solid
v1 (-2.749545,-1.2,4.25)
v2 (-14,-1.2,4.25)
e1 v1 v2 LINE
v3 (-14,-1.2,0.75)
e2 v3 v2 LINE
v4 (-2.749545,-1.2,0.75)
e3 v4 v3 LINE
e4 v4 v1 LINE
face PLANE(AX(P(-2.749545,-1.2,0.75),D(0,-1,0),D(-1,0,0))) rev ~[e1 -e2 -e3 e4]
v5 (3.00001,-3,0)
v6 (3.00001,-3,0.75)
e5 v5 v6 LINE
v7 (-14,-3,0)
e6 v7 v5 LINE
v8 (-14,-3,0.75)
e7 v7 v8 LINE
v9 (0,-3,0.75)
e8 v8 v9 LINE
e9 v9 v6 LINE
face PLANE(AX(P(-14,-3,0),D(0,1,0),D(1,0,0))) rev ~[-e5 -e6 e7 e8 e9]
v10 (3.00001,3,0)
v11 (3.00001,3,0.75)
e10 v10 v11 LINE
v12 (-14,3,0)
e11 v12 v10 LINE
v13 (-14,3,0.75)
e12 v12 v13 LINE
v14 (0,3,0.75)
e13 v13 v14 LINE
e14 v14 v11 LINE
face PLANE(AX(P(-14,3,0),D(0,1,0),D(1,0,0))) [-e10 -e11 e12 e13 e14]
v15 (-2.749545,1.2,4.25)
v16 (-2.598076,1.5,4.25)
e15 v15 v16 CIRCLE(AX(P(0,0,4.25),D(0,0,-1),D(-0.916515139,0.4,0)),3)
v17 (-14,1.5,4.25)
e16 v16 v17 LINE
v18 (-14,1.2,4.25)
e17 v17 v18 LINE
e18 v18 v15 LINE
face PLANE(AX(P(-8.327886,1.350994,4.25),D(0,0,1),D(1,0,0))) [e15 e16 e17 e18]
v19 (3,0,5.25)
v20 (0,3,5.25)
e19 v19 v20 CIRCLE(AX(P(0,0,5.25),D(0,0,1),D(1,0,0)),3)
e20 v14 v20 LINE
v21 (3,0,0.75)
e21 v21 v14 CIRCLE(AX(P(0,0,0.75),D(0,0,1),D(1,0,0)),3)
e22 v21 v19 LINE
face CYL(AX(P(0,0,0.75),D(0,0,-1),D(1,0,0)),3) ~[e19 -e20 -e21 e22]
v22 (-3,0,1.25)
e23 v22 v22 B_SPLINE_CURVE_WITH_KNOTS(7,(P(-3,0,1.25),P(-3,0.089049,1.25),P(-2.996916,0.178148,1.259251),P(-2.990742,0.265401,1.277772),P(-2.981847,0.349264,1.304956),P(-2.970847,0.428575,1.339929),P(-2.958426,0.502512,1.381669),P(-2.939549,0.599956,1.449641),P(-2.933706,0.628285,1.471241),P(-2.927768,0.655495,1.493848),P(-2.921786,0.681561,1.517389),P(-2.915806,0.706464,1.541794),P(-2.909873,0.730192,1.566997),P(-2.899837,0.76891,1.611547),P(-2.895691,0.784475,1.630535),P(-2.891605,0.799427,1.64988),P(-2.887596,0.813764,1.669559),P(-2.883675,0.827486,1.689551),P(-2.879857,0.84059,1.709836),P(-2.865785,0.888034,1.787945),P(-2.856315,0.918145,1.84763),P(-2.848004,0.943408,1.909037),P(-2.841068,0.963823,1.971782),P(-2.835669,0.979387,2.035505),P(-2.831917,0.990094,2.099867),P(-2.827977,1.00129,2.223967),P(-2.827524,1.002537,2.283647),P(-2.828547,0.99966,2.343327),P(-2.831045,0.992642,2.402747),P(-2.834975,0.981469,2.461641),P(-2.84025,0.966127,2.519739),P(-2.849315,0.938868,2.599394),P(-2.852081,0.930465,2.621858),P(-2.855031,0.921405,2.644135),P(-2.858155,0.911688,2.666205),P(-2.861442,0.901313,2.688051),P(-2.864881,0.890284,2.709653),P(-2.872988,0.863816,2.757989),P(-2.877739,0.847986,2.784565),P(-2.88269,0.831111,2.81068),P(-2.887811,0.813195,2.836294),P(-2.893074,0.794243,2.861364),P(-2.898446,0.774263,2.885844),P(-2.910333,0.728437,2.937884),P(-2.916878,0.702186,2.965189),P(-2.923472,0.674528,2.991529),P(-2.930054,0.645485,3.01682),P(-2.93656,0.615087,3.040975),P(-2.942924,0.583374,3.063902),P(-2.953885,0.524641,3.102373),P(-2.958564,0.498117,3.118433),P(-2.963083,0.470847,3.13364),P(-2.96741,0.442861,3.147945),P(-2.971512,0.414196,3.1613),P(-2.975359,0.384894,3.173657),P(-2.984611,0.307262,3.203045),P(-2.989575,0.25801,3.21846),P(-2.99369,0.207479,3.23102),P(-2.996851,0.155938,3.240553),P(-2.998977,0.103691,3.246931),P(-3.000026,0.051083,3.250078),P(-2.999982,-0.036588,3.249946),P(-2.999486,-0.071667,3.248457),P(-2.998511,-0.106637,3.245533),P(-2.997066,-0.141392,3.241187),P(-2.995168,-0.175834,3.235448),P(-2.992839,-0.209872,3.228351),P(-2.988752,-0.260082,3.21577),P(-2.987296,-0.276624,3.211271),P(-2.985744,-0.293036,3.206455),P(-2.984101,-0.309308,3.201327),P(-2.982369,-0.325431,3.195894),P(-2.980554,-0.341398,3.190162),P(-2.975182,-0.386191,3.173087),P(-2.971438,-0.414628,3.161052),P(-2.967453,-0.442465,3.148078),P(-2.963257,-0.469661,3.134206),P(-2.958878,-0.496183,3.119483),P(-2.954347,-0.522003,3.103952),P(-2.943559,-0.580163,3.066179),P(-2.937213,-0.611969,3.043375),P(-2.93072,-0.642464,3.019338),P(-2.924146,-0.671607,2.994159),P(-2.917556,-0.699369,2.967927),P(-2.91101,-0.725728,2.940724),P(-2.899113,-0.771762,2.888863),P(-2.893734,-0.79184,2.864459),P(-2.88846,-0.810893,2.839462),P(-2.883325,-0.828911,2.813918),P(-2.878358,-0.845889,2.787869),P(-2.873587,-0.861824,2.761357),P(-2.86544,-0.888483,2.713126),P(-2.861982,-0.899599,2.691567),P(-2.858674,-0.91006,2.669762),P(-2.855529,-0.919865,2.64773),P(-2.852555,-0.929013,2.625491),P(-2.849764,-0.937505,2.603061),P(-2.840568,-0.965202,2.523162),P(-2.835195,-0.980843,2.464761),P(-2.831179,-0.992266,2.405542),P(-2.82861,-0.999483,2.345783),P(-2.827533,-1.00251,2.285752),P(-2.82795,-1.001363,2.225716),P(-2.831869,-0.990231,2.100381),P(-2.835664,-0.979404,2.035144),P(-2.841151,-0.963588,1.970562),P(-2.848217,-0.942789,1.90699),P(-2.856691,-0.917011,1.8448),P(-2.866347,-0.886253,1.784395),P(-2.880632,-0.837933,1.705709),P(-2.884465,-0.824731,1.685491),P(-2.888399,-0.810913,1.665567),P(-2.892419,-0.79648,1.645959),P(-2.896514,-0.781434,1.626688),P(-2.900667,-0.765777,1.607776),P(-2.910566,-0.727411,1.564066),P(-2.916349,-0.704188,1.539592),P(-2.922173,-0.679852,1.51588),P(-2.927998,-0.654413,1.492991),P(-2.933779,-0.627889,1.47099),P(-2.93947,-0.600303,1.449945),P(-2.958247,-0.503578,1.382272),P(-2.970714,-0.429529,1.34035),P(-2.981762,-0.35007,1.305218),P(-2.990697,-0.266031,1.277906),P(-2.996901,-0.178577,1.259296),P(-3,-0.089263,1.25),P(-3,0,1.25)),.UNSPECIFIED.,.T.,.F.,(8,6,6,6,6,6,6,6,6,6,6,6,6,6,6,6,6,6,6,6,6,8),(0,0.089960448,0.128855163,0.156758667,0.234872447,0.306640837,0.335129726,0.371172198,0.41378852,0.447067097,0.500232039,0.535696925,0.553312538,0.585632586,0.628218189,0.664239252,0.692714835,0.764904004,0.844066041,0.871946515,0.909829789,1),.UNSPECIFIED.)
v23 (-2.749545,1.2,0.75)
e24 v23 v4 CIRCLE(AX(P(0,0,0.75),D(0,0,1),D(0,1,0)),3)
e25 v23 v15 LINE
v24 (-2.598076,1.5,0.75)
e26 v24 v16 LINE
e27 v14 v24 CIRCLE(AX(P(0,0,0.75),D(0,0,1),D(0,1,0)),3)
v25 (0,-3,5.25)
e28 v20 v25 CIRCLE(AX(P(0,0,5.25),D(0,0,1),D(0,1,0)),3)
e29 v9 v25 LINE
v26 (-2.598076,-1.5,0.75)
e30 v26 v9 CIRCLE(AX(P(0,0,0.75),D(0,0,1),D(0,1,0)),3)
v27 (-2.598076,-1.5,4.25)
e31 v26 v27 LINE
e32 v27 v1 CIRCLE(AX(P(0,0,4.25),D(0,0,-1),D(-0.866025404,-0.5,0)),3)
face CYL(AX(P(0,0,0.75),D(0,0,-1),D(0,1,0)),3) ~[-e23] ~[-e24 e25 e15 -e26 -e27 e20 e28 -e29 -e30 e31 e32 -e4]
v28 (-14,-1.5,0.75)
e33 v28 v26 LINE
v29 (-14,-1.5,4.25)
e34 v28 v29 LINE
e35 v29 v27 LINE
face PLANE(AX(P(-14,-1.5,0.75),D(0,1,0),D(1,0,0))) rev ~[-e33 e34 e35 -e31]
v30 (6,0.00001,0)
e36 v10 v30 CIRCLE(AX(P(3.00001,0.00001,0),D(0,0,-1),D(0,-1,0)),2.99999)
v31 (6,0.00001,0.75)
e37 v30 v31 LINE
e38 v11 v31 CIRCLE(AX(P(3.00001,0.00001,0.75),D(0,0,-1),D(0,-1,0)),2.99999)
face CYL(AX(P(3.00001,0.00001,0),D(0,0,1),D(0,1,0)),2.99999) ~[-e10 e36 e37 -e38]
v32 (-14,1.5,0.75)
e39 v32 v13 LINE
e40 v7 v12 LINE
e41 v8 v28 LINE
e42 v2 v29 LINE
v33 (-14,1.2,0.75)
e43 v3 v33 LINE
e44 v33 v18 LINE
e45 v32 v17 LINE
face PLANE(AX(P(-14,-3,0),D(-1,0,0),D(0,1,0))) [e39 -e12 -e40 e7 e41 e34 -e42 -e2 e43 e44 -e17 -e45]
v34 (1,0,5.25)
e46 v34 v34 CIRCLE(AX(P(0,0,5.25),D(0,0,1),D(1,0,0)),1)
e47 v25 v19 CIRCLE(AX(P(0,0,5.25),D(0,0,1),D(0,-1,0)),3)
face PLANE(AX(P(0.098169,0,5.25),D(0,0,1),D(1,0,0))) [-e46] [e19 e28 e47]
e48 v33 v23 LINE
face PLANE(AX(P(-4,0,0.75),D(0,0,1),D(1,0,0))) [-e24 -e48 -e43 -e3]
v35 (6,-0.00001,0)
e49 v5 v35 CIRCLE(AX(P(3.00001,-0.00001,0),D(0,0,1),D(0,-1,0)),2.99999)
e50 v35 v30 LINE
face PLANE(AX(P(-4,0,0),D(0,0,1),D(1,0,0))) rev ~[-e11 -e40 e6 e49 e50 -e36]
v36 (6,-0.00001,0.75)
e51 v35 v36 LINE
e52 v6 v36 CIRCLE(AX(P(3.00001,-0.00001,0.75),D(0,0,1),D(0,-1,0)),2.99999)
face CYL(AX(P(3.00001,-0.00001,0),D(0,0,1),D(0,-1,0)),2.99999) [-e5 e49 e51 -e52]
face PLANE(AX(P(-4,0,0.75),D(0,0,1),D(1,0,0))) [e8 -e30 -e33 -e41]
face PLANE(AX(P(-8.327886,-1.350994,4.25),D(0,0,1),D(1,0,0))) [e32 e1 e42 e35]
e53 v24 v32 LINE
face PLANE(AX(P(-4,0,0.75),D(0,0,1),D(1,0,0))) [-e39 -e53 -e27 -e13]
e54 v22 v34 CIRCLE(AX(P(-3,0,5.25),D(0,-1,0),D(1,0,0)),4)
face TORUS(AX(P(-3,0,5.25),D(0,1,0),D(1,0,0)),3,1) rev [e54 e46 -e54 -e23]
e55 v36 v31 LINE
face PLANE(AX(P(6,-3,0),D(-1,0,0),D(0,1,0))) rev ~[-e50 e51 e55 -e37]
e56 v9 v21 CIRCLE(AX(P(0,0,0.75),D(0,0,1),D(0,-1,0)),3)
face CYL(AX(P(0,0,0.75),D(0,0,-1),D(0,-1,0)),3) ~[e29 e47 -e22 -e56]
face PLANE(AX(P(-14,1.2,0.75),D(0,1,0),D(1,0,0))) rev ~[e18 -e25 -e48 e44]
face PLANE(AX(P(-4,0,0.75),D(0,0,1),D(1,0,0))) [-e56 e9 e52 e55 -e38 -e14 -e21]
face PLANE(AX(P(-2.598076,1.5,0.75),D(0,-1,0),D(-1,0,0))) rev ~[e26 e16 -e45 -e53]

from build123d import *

# Parameters (mm, degrees)
F0_W     = 20
F0_H     = 6
F1_DEPTH = 0.75
F3_DEPTH = 4.5
F4_R     = 1
F6_R     = 2.99999
F8_DEPTH = 3.5


# Not quite as in the source:
# - a fillet or chamfer is up to 0.001 mm smaller than in the source, because OpenCascade refuses the exact size


with BuildPart() as f1:
    # F0 (on Top) → F1 (new body)
    with BuildSketch(Plane.XY):
        with Locations((-4, 0)):
            Rectangle(F0_W, F0_H)
    extrude(amount=F1_DEPTH)

    # F2 (on face) → F3 (join)
    with BuildSketch(Plane.XY.offset(0.75)):
        with BuildLine():
            ThreePointArc((0, -3), (2.1213203436, -2.1213203436), (3, 0))
            ThreePointArc((3, 0), (2.1213203436, 2.1213203436), (0, 3))
            ThreePointArc((0, 3), (-3, 0), (0, -3))
        make_face()
    extrude(amount=F3_DEPTH)

    # F4 (on face) → F5 (revolve, cut)
    with BuildSketch(Plane.XY.offset(5.25)):
        Circle(F4_R)
    revolve(axis=Axis((-3, -2.9594153166, 5.25), (0, -1, 0)), mode=Mode.SUBTRACT)

    # F6 (radius 3 in the source; OpenCascade refuses exactly that, so slightly less here)
    f6_edges = [f1.edges().sort_by_distance(p)[0] for p in [
        (6, -3, 0.375),
        (6, 3, 0.375),
    ]]
    fillet(f6_edges, radius=F6_R)

    # F7 (on face) → F8 (join)
    with BuildSketch(Plane.XY.offset(0.75)):
        with BuildLine():
            Line((-2.5980762114, 1.5), (-14, 1.5))
            Line((-14, 1.5), (-14, 1.2))
            Line((-14, 1.2), (-2.749545417, 1.2))
            ThreePointArc((-2.749545417, 1.2), (-2.6780149869, 1.3521226757), (-2.5980762114, 1.5))
        make_face()
        with BuildLine():
            Line((-2.749545417, -1.2), (-14, -1.2))
            Line((-14, -1.2), (-14, -1.5))
            Line((-14, -1.5), (-2.5980762114, -1.5))
            ThreePointArc((-2.5980762114, -1.5), (-2.6780149869, -1.3521226757), (-2.749545417, -1.2))
        make_face()
    extrude(amount=F8_DEPTH)


solid = f1.part
